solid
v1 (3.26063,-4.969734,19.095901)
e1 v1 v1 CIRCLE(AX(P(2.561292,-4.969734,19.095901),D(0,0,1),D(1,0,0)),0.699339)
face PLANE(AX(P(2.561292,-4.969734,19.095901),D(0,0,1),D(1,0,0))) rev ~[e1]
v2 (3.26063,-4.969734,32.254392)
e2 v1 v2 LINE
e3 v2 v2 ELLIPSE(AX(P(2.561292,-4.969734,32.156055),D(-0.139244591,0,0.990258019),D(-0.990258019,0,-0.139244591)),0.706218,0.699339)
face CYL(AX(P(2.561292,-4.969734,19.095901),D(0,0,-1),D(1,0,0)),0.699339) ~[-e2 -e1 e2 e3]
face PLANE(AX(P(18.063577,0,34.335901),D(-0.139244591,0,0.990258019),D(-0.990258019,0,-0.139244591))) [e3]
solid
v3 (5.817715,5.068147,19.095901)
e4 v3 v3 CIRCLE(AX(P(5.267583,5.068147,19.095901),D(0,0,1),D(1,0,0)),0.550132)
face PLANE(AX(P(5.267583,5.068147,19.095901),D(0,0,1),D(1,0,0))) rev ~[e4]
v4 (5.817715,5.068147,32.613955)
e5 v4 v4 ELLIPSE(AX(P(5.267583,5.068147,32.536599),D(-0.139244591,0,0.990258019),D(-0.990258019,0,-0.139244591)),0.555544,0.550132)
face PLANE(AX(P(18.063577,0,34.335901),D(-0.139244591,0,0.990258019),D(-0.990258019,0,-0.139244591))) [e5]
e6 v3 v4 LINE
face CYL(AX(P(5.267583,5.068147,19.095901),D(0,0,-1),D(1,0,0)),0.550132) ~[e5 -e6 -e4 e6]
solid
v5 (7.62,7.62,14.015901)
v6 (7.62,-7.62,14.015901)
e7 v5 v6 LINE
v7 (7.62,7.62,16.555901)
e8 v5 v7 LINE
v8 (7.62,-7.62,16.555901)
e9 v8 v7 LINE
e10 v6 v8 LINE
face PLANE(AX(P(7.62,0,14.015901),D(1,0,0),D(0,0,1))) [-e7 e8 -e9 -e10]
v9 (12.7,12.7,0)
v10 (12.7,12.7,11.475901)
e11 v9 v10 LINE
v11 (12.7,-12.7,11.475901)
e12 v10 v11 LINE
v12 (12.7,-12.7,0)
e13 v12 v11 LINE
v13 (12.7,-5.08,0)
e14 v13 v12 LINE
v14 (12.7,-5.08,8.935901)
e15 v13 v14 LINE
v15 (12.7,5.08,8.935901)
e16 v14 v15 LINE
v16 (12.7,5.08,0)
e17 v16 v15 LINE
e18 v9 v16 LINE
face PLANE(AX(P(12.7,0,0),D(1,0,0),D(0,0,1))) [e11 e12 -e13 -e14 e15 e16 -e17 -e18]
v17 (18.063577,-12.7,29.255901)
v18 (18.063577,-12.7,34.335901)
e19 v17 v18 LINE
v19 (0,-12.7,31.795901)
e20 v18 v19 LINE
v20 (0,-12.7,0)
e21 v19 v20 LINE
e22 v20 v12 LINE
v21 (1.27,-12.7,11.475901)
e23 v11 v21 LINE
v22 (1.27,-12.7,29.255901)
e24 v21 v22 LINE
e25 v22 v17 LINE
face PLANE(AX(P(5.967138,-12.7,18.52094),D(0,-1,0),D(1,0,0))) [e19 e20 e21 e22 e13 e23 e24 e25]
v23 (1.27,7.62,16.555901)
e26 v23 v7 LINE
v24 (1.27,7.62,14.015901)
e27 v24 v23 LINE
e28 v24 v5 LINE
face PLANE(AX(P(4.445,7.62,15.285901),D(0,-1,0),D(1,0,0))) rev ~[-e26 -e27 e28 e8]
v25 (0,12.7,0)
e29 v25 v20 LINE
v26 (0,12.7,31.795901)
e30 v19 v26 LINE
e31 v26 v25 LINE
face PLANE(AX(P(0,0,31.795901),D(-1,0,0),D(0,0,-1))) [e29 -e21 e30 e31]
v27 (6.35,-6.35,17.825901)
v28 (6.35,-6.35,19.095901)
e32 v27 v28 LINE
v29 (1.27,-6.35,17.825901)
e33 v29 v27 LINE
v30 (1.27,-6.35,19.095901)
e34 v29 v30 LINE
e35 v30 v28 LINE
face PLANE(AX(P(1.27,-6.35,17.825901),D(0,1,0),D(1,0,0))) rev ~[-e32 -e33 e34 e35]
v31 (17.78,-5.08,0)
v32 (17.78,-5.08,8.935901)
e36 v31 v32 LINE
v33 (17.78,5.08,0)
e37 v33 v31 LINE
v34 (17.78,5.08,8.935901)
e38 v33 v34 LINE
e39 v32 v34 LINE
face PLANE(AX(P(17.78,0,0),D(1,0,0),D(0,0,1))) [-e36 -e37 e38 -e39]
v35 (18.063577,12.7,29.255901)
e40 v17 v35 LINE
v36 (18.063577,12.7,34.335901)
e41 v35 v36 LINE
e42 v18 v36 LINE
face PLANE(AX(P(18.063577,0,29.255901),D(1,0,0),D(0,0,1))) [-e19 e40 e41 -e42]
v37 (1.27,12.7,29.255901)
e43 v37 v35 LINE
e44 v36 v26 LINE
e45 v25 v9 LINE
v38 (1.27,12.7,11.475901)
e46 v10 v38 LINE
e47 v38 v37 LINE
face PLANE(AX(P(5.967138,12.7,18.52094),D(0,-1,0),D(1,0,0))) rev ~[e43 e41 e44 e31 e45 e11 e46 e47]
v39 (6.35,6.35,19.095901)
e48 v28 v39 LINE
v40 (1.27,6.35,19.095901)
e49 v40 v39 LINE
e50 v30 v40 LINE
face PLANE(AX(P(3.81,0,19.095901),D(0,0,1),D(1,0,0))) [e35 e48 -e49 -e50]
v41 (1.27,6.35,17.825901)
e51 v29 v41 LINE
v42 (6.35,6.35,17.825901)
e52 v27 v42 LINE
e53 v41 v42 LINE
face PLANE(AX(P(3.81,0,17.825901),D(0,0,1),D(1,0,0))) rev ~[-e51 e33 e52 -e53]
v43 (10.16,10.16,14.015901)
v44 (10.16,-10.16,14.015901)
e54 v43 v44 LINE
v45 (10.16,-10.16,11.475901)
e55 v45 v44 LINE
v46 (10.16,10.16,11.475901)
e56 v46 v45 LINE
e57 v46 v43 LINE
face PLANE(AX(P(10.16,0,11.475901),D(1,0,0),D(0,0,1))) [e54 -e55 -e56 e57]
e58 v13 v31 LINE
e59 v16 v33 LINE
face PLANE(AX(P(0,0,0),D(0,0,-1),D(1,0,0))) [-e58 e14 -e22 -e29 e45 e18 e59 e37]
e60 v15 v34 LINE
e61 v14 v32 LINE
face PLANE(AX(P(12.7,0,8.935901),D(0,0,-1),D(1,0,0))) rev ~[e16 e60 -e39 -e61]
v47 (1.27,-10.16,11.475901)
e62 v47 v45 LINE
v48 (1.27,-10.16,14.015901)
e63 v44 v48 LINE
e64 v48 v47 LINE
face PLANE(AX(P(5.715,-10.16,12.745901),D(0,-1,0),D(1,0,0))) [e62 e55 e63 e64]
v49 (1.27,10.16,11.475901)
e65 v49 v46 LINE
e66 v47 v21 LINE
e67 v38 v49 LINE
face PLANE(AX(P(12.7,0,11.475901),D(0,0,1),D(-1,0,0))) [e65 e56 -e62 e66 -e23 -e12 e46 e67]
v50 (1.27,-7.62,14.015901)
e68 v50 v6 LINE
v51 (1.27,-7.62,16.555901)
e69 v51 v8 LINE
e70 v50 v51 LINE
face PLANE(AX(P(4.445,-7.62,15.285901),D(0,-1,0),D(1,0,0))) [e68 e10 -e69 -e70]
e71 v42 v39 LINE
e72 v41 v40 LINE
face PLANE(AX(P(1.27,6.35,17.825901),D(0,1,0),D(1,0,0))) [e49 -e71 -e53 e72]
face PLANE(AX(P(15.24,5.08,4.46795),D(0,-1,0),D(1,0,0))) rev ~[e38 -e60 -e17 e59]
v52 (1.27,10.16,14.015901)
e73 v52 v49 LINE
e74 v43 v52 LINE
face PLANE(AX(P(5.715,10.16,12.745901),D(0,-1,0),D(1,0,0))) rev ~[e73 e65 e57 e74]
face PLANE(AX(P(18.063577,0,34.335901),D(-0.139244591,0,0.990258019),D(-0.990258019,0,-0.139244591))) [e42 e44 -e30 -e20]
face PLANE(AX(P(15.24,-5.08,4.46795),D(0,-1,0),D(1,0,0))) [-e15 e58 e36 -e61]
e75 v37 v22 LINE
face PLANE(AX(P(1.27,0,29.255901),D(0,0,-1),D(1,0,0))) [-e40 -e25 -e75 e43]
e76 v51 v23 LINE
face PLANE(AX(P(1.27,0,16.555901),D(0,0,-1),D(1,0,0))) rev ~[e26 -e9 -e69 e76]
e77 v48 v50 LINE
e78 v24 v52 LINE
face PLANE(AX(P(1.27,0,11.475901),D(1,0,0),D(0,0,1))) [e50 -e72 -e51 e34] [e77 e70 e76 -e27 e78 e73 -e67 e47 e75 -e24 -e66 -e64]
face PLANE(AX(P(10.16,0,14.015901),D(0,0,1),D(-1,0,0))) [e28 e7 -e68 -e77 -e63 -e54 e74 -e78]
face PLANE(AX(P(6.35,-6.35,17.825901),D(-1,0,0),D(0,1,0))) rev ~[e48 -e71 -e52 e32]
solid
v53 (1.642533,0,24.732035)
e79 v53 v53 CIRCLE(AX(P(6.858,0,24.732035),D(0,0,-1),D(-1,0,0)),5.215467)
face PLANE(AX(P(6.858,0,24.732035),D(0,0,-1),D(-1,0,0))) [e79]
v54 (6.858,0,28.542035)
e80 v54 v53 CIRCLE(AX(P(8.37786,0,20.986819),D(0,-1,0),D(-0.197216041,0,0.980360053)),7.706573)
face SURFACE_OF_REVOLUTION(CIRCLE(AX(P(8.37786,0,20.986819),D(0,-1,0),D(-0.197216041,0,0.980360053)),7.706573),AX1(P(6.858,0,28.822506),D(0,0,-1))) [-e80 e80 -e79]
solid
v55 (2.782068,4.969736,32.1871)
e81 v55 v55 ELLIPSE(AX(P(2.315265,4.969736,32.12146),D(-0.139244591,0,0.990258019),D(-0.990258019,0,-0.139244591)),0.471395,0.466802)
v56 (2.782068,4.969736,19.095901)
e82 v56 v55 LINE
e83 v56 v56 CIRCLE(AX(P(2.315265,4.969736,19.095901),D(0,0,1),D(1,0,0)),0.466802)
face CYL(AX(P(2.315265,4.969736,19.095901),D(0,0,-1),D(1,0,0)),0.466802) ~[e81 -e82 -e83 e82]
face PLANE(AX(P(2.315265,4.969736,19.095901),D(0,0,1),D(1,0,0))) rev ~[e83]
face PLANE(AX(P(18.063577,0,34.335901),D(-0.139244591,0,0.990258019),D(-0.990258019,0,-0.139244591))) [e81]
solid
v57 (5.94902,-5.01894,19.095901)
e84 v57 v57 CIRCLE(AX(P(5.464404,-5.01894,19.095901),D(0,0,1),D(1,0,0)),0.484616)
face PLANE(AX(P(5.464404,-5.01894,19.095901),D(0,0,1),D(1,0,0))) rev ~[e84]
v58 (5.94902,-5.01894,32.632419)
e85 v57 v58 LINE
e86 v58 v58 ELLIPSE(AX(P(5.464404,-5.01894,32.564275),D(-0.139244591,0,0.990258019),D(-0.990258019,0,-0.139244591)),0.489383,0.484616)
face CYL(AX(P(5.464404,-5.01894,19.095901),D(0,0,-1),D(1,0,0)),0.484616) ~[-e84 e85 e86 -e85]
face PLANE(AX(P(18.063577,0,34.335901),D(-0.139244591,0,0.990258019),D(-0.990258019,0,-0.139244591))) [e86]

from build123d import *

# Parameters (mm, degrees)
F1_DEPTH  = 12.7
F0_W      = 5.08
F0_H      = 8.9359007079
F2_DEPTH  = 5.08
F3_DEPTH  = 10.16
F0_W_2    = 6.35
F0_H_2    = 2.54
F4_DEPTH  = 7.62
F8_W      = 5.08
F8_H      = 12.7
F9_DEPTH  = 1.27
F10_R     = 0.6993385281
F11_REACH = 17.2190280622
F10_R_2   = 0.4846158618
F10_R_3   = 0.4668021957
F10_R_4   = 0.550131889


with BuildPart() as f1:
    # F0 (on Front) → F1 (new body, symmetric)
    with BuildSketch(Plane.XZ):
        Polygon((0, 31.7959007079), (0, 0), (12.7, 0), (12.7, 8.9359007079), (12.7, 11.4759007079), (10.16, 11.4759007079), (1.27, 11.4759007079), (1.27, 14.0159007079), (1.27, 16.5559007079), (1.27, 29.2559007079), (18.063576892, 29.2559007079), (18.063576892, 34.3359007079), align=None)
    extrude(amount=F1_DEPTH, both=True)

    # F0 (on Front) → F2 (join, symmetric)
    with BuildSketch(Plane.XZ):
        with Locations((15.24, 4.467950354)):
            Rectangle(F0_W, F0_H)
    extrude(amount=F2_DEPTH, both=True)

    # F0 (on Front) → F3 (join, symmetric)
    with BuildSketch(Plane.XZ):
        Polygon((1.27, 11.4759007079), (10.16, 11.4759007079), (10.16, 14.0159007079), (7.62, 14.0159007079), (1.27, 14.0159007079), align=None)
    extrude(amount=F3_DEPTH, both=True)

    # F0 (on Front) → F4 (join, symmetric)
    with BuildSketch(Plane.XZ):
        with Locations((4.445, 15.2859007079)):
            Rectangle(F0_W_2, F0_H_2)
    extrude(amount=F4_DEPTH, both=True)

    # F8 (on offset) → F9 (join)
    with BuildSketch(Plane.XY.offset(17.8259007079)):
        with Locations((3.81, 0)):
            Rectangle(F8_W, F8_H)
    extrude(amount=F9_DEPTH)


with BuildPart() as f6:
    # F5 (on Front) → F6 (revolve)
    with BuildSketch(Plane.XZ):
        with BuildLine():
            ThreePointArc((6.858, 28.5420352743), (3.8318670551, 27.2097778537), (1.6425333333, 24.7320352743))
            Line((1.6425333333, 24.7320352743), (6.858, 24.7320352743))
            Line((6.858, 24.7320352743), (6.858, 28.5420352743))
        make_face()
    revolve(axis=Axis((6.858, 0, 28.8225058466), (0, 0, -1)))


with BuildPart() as f11:
    f11_end = f1.part.faces().sort_by_distance((9.031788446, 0, 33.0659007079))[0]
    # F10 (on face) → F11 (new body, up to a face of F1 that its end follows)
    with BuildSketch(Plane.XY.offset(19.0959007079)):
        with Locations((2.5612919126, -4.9697342329)):
            Circle(F10_R)
    f11_long = extrude(amount=F11_REACH, mode=Mode.PRIVATE)
    add(split(f11_long, bisect_by=f11_end, keep=Keep.BOTTOM, mode=Mode.PRIVATE))


with BuildPart() as f11b:
    f11_2_end = f1.part.faces().sort_by_distance((9.031788446, 0, 33.0659007079))[0]
    # F10 (on face) → F11, piece 2 (new body, up to a face of F1 that its end follows)
    with BuildSketch(Plane.XY.offset(19.0959007079)):
        with Locations((5.4644043557, -5.0189397298)):
            Circle(F10_R_2)
    f11_2_long = extrude(amount=F11_REACH, mode=Mode.PRIVATE)
    add(split(f11_2_long, bisect_by=f11_2_end, keep=Keep.BOTTOM, mode=Mode.PRIVATE))


with BuildPart() as f11c:
    f11_3_end = f1.part.faces().sort_by_distance((9.031788446, 0, 33.0659007079))[0]
    # F10 (on face) → F11, piece 3 (new body, up to a face of F1 that its end follows)
    with BuildSketch(Plane.XY.offset(19.0959007079)):
        with Locations((2.3152653594, 4.9697356299)):
            Circle(F10_R_3)
    f11_3_long = extrude(amount=F11_REACH, mode=Mode.PRIVATE)
    add(split(f11_3_long, bisect_by=f11_3_end, keep=Keep.BOTTOM, mode=Mode.PRIVATE))


with BuildPart() as f11d:
    f11_4_end = f1.part.faces().sort_by_distance((9.031788446, 0, 33.0659007079))[0]
    # F10 (on face) → F11, piece 4 (new body, up to a face of F1 that its end follows)
    with BuildSketch(Plane.XY.offset(19.0959007079)):
        with Locations((5.2675828338, 5.0681466237)):
            Circle(F10_R_4)
    f11_4_long = extrude(amount=F11_REACH, mode=Mode.PRIVATE)
    add(split(f11_4_long, bisect_by=f11_4_end, keep=Keep.BOTTOM, mode=Mode.PRIVATE))


solid = Compound([f1.part, f6.part, f11.part, f11b.part, f11c.part, f11d.part])
